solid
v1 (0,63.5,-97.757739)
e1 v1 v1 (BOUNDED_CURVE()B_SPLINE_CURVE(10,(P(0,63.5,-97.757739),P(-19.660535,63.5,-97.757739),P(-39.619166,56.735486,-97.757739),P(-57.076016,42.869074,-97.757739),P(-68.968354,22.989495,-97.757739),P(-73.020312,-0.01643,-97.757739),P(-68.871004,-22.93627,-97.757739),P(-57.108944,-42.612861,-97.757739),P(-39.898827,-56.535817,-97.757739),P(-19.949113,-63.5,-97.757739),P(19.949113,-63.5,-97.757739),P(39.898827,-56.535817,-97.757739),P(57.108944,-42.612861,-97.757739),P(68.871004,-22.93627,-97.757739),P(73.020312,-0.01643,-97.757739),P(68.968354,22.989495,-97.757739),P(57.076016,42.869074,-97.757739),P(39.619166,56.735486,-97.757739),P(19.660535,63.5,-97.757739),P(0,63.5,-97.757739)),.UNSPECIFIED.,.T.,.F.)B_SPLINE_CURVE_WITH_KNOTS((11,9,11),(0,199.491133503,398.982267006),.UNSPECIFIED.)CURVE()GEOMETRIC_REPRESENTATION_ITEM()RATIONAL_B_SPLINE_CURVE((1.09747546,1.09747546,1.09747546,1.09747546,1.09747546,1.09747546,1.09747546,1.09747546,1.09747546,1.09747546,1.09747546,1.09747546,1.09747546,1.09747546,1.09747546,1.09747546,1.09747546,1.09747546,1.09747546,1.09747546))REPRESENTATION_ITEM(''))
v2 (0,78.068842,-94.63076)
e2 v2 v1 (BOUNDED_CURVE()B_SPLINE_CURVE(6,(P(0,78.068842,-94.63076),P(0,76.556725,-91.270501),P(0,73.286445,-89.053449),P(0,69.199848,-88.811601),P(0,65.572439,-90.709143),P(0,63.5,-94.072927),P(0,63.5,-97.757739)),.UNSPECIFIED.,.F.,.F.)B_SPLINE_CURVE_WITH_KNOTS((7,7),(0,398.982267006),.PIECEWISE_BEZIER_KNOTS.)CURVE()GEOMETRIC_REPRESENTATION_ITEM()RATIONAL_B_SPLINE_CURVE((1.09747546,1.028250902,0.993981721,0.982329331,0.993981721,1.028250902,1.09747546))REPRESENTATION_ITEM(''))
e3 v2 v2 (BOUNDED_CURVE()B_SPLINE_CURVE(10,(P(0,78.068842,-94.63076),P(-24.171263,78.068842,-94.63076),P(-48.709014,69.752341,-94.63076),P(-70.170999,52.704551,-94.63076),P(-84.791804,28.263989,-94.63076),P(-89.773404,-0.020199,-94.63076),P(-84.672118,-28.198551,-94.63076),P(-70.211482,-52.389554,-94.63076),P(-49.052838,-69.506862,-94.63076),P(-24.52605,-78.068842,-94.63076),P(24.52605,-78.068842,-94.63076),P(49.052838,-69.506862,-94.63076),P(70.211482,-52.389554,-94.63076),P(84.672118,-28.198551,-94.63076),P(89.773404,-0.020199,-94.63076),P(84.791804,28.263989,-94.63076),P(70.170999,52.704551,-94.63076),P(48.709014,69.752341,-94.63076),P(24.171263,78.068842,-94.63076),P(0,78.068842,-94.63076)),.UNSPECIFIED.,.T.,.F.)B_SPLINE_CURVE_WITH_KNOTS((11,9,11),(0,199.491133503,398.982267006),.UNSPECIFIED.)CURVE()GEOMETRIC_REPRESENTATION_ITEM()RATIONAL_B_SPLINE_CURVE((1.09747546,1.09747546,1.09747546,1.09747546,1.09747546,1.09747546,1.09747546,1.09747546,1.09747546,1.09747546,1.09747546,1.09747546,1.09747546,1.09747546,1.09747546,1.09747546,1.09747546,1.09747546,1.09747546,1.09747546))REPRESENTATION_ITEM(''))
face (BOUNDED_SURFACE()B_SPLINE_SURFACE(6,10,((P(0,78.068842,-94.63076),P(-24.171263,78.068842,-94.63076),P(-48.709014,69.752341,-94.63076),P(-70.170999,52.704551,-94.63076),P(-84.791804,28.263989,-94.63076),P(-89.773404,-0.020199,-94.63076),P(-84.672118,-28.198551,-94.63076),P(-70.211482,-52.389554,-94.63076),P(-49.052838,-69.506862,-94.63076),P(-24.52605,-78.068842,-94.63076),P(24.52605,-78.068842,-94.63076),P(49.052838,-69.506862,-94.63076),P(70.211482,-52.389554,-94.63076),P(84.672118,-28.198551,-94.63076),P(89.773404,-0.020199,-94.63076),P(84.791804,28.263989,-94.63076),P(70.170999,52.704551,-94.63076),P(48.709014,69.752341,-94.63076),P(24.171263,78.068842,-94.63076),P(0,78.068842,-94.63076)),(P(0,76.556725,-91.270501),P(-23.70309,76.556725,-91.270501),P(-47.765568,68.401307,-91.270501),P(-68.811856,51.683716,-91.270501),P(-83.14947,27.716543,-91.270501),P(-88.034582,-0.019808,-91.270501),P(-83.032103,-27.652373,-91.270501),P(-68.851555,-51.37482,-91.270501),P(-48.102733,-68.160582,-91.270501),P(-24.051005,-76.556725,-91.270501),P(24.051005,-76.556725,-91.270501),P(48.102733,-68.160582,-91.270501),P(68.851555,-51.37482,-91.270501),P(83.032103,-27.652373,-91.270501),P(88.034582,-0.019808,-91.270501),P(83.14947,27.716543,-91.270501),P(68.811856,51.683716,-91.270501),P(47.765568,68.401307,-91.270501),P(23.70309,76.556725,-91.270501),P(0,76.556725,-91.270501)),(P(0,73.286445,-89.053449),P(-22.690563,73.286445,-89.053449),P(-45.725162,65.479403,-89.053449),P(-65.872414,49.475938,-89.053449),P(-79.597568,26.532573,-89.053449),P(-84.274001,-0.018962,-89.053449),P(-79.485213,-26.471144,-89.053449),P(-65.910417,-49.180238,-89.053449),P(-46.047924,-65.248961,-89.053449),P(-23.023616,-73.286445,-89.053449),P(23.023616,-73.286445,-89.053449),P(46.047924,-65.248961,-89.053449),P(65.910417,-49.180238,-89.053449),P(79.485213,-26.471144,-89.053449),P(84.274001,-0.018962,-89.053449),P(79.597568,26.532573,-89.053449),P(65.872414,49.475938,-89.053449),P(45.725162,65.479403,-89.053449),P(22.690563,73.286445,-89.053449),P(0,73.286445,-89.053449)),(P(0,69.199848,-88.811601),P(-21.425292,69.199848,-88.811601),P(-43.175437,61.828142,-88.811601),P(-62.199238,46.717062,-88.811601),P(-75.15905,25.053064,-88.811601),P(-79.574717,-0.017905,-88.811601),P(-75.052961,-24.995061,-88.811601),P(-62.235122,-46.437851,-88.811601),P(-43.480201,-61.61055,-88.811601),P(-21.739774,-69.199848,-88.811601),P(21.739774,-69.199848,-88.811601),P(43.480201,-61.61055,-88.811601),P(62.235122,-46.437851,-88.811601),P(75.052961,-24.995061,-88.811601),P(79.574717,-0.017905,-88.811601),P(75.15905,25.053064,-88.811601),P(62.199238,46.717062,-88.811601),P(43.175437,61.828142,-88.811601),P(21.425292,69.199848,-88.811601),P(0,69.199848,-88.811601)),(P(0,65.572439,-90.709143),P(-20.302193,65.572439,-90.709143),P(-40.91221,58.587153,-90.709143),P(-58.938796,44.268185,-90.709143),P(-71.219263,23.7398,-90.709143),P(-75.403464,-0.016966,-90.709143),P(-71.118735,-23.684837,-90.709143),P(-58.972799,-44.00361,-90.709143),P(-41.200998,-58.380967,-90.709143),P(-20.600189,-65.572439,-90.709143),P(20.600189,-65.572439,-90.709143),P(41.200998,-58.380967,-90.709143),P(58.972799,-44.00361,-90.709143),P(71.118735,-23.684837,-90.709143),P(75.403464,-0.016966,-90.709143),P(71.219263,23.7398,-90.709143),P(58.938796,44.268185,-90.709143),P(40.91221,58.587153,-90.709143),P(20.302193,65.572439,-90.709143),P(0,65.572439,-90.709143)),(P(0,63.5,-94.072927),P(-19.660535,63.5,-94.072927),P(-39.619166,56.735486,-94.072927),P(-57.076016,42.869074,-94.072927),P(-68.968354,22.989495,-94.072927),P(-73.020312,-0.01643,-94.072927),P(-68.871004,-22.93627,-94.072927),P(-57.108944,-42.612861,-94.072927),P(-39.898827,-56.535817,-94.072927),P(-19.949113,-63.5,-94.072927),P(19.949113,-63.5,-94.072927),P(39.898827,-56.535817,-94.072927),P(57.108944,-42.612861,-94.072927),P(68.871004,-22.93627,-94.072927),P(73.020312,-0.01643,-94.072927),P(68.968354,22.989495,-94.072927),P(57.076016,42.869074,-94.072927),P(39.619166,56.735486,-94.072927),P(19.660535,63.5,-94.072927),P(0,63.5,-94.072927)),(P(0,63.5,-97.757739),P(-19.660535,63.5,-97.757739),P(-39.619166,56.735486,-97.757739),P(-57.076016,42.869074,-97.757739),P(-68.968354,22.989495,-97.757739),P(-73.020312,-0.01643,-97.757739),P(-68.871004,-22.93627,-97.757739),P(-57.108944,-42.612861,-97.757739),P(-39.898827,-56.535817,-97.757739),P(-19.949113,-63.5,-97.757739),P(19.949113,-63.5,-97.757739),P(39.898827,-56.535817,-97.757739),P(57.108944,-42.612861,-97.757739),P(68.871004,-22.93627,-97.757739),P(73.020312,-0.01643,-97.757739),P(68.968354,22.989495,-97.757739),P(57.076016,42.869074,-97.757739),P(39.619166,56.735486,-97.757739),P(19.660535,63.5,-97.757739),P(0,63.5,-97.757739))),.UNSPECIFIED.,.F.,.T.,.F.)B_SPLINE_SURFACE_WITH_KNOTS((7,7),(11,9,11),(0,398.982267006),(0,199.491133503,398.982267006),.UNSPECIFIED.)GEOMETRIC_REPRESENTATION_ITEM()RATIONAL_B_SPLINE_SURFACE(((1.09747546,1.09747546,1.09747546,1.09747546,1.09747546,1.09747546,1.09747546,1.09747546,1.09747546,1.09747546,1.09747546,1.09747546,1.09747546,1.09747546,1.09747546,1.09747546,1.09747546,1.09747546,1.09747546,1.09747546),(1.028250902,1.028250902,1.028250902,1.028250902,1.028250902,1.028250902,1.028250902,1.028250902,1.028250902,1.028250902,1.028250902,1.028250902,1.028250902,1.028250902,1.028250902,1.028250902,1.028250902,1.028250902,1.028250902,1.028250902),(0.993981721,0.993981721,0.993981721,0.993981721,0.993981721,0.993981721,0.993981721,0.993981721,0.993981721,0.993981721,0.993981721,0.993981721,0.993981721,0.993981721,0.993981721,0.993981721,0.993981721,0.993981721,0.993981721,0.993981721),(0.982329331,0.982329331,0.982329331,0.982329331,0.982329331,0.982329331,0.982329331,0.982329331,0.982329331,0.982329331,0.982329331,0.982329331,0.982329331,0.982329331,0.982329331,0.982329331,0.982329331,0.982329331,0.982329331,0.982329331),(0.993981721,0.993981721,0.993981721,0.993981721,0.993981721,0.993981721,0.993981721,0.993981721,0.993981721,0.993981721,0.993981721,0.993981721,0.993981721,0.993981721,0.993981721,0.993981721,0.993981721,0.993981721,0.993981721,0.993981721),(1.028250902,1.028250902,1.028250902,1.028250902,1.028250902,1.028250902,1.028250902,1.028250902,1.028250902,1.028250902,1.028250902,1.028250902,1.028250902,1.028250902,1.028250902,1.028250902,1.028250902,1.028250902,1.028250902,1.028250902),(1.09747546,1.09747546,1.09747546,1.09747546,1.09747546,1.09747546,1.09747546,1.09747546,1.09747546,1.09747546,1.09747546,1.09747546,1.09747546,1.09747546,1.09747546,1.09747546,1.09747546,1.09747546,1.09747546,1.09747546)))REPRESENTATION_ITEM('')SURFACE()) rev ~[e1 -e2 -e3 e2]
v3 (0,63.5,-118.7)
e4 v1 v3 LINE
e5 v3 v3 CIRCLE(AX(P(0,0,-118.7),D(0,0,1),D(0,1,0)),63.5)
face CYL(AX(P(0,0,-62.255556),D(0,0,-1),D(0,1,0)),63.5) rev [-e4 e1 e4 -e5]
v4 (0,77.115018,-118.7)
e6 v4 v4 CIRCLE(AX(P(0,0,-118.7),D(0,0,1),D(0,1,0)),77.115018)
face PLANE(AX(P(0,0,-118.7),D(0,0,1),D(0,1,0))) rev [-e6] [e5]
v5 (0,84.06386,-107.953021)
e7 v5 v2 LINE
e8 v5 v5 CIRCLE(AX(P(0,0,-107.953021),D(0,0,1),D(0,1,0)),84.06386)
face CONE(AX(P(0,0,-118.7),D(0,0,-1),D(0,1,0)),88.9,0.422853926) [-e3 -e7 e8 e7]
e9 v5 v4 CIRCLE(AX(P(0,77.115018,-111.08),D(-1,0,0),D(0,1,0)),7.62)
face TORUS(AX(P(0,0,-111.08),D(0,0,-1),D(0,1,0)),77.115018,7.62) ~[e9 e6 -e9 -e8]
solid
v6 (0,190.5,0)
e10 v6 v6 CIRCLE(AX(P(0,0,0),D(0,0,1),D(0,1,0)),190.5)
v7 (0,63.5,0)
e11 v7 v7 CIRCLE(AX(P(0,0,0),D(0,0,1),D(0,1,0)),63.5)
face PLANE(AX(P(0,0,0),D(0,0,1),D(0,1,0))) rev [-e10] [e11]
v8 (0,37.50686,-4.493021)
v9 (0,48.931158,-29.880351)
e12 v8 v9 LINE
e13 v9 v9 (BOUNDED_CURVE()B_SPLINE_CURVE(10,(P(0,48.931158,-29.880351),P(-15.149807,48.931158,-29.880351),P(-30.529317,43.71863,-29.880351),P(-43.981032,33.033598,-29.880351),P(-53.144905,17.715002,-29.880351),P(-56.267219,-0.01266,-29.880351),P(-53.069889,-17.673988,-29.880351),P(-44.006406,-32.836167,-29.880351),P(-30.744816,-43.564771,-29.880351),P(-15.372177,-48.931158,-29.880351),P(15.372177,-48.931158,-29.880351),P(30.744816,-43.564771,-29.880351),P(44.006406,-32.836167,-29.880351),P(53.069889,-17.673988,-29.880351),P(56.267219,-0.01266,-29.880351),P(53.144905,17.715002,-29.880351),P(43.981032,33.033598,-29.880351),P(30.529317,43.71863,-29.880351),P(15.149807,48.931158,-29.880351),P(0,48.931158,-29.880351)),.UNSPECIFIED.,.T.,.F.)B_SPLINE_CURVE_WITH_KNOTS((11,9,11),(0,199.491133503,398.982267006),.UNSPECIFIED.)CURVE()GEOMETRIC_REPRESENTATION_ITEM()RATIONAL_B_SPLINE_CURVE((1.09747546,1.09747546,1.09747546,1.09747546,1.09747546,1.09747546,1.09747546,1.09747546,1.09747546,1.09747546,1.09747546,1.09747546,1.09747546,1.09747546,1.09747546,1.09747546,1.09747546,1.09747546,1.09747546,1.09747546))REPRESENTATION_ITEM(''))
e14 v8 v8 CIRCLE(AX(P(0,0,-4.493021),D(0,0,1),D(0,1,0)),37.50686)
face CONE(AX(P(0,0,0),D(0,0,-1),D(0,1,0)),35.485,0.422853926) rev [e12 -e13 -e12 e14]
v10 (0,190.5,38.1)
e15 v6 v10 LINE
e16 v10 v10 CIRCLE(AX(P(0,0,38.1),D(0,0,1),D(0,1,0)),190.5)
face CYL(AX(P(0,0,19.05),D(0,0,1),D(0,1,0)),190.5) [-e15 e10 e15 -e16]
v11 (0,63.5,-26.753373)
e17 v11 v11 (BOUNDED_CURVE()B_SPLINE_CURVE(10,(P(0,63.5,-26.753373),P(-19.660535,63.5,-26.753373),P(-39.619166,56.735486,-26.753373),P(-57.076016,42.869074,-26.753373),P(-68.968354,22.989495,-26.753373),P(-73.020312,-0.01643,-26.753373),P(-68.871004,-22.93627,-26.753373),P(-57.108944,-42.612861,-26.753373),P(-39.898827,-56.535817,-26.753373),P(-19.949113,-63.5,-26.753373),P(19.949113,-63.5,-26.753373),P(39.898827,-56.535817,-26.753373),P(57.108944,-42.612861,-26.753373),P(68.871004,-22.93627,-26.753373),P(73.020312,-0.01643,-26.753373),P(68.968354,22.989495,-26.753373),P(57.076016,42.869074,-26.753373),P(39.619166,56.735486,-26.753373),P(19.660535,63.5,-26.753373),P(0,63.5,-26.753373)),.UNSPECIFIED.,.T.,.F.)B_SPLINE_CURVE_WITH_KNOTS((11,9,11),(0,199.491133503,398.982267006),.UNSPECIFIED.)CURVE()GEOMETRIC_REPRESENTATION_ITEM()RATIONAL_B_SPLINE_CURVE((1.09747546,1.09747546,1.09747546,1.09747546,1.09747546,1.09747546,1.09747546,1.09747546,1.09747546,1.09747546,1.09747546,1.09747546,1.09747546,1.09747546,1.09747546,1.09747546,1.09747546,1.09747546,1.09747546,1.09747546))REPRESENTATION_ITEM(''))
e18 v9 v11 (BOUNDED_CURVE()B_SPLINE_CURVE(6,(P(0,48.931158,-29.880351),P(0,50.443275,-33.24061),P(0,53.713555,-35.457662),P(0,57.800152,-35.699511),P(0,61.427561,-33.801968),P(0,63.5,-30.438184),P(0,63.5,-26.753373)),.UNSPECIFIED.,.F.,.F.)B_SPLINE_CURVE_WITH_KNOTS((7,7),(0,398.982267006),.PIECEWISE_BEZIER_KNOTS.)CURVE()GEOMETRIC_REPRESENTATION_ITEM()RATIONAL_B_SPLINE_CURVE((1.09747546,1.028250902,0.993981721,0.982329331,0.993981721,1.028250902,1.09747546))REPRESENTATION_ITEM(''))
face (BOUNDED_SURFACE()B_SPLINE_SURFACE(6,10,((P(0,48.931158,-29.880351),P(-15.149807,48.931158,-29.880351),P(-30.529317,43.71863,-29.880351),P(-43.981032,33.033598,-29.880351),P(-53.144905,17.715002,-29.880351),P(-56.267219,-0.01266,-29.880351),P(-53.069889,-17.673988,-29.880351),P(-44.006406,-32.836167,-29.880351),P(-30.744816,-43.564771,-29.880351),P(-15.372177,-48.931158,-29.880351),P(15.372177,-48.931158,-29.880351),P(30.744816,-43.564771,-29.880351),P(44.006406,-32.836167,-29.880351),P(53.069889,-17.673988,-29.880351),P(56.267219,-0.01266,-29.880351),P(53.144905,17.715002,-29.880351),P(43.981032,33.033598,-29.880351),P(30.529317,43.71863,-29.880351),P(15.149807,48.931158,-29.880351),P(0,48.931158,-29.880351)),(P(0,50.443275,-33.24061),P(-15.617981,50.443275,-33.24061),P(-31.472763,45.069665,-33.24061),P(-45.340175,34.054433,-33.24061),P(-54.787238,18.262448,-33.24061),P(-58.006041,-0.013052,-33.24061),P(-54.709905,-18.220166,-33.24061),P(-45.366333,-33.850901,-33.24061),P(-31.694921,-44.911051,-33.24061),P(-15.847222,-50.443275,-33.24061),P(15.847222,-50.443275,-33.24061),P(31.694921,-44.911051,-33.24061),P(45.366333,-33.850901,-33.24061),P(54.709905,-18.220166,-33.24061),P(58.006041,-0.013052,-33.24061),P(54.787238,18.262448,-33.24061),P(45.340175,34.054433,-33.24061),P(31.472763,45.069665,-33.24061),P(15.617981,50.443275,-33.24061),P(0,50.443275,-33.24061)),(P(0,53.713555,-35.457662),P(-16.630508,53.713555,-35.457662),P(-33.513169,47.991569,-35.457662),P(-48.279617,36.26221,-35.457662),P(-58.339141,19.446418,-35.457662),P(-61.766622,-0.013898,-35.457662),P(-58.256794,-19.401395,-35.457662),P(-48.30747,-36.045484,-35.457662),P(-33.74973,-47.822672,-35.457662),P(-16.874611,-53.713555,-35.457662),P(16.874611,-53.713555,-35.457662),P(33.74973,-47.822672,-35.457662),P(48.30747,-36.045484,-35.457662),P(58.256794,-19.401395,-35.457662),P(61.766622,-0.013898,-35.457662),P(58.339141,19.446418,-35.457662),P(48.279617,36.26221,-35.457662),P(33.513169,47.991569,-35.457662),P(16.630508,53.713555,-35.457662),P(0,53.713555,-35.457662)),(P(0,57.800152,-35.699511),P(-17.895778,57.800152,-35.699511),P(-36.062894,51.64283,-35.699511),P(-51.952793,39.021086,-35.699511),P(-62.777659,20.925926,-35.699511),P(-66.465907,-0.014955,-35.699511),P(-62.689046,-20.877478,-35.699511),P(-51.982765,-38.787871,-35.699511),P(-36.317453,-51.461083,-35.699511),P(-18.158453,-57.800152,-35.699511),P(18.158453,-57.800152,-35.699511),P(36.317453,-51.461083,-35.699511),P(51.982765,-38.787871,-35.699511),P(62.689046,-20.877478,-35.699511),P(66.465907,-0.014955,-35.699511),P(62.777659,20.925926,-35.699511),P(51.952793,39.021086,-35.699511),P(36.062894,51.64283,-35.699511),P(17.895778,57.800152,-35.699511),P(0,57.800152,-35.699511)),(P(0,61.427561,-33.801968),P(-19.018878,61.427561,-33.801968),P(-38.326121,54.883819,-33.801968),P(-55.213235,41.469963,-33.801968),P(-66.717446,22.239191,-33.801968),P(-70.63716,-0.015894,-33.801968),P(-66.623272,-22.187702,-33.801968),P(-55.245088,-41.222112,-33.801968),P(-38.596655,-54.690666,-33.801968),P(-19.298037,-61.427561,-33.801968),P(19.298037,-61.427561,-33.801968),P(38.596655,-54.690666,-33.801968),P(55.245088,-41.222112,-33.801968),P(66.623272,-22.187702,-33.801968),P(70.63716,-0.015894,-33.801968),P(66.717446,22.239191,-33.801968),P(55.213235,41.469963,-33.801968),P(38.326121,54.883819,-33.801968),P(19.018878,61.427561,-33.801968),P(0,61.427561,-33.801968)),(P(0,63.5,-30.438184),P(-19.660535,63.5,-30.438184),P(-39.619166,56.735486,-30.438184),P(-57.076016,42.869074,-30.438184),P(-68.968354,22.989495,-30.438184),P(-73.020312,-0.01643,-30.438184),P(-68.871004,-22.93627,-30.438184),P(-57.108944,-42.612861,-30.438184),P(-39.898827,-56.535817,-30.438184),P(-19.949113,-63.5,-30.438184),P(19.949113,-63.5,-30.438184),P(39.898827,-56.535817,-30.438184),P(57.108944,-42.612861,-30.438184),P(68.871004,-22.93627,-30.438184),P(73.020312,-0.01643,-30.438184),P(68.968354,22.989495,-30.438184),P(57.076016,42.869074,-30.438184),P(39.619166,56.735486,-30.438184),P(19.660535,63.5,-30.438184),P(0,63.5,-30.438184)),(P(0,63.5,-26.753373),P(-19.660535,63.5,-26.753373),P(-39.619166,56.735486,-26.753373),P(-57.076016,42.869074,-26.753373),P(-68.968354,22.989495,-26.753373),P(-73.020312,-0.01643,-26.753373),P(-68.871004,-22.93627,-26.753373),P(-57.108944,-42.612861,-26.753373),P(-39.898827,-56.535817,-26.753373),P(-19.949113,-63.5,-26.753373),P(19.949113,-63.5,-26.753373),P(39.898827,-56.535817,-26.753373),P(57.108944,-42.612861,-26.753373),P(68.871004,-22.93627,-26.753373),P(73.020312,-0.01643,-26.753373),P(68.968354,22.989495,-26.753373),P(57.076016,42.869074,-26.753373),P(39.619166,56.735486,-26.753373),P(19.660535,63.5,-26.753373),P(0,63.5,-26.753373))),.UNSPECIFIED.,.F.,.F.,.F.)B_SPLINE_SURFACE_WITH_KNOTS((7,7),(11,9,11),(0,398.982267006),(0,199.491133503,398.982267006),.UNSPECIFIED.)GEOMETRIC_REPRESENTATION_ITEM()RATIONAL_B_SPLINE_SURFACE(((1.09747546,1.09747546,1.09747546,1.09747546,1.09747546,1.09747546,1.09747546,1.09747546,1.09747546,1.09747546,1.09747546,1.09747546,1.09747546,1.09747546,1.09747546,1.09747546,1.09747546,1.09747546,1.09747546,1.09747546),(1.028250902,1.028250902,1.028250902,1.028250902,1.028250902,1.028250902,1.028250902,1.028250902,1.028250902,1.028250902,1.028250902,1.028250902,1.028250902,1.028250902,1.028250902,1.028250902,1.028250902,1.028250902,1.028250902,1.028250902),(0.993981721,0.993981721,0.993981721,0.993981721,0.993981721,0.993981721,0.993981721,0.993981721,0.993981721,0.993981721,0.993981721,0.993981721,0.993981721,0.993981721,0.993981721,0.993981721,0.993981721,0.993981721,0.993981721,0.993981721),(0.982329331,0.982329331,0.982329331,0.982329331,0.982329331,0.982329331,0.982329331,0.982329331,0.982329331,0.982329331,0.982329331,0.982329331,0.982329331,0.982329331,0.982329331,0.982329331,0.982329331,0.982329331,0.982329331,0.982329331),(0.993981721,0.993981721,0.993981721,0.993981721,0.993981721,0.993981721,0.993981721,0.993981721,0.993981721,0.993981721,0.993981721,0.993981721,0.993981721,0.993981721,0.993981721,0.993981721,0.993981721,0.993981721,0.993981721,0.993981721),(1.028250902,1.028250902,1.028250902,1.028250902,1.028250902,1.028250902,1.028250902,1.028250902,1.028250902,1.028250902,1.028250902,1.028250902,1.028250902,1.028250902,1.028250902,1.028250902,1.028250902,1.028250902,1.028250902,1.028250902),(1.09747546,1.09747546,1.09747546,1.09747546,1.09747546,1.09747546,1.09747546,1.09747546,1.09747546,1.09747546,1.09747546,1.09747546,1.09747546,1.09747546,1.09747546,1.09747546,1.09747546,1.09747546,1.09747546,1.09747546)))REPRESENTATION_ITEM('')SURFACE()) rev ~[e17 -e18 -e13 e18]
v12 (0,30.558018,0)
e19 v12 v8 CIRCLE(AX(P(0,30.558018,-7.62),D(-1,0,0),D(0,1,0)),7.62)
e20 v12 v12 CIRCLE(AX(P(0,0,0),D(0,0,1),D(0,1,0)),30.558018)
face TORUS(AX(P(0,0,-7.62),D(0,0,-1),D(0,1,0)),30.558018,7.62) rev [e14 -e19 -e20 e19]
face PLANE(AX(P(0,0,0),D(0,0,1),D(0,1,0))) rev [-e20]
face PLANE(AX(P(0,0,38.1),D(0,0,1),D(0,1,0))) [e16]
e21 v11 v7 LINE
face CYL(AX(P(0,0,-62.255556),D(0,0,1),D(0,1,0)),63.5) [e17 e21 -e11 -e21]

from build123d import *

# Parameters (mm, degrees)
F0_W   = 127
F0_H   = 38.1
F2_R   = 7.62
F2_2_R = 7.62


with BuildPart() as f1:
    # F0 (on Right) → F1 (revolve)
    with BuildSketch(Plane.YZ):
        Polygon((0, 8.3), (0, 0), (35.485, 0), (31.75, 8.3), align=None)
        Polygon((31.75, 8.3), (35.485, 0), (63.5, 0), (63.5, 38.1), (0, 38.1), (0, 8.3), align=None)
        Polygon((63.5, 0), (35.485, 0), (63.5, -62.2555555556), align=None)
        with Locations((127, 19.05)):
            Rectangle(F0_W, F0_H)
    revolve(axis=Axis((0, 0, 4.15), (0, 0, 1)))

    # F2#2
    f2_2_edges = [f1.edges().sort_by_distance(p)[0] for p in [
        (0, -35.485, 0),
        (0, -63.5, -62.255556),
    ]]
    fillet(f2_2_edges, radius=F2_2_R)


with BuildPart() as f1b:
    # F0 (on Right) → F1, piece 2 (revolve)
    with BuildSketch(Plane.YZ):
        Polygon((88.9, -118.7), (63.5, -62.2555555556), (63.5, -118.7), align=None)
    revolve(axis=Axis((0, 0, 4.15), (0, 0, 1)))

    # F2
    f2_edges = [f1b.edges().sort_by_distance(p)[0] for p in [
        (0, -88.9, -118.7),
        (0, -63.5, -62.255556),
    ]]
    fillet(f2_edges, radius=F2_R)


solid = Compound([f1.part, f1b.part])
